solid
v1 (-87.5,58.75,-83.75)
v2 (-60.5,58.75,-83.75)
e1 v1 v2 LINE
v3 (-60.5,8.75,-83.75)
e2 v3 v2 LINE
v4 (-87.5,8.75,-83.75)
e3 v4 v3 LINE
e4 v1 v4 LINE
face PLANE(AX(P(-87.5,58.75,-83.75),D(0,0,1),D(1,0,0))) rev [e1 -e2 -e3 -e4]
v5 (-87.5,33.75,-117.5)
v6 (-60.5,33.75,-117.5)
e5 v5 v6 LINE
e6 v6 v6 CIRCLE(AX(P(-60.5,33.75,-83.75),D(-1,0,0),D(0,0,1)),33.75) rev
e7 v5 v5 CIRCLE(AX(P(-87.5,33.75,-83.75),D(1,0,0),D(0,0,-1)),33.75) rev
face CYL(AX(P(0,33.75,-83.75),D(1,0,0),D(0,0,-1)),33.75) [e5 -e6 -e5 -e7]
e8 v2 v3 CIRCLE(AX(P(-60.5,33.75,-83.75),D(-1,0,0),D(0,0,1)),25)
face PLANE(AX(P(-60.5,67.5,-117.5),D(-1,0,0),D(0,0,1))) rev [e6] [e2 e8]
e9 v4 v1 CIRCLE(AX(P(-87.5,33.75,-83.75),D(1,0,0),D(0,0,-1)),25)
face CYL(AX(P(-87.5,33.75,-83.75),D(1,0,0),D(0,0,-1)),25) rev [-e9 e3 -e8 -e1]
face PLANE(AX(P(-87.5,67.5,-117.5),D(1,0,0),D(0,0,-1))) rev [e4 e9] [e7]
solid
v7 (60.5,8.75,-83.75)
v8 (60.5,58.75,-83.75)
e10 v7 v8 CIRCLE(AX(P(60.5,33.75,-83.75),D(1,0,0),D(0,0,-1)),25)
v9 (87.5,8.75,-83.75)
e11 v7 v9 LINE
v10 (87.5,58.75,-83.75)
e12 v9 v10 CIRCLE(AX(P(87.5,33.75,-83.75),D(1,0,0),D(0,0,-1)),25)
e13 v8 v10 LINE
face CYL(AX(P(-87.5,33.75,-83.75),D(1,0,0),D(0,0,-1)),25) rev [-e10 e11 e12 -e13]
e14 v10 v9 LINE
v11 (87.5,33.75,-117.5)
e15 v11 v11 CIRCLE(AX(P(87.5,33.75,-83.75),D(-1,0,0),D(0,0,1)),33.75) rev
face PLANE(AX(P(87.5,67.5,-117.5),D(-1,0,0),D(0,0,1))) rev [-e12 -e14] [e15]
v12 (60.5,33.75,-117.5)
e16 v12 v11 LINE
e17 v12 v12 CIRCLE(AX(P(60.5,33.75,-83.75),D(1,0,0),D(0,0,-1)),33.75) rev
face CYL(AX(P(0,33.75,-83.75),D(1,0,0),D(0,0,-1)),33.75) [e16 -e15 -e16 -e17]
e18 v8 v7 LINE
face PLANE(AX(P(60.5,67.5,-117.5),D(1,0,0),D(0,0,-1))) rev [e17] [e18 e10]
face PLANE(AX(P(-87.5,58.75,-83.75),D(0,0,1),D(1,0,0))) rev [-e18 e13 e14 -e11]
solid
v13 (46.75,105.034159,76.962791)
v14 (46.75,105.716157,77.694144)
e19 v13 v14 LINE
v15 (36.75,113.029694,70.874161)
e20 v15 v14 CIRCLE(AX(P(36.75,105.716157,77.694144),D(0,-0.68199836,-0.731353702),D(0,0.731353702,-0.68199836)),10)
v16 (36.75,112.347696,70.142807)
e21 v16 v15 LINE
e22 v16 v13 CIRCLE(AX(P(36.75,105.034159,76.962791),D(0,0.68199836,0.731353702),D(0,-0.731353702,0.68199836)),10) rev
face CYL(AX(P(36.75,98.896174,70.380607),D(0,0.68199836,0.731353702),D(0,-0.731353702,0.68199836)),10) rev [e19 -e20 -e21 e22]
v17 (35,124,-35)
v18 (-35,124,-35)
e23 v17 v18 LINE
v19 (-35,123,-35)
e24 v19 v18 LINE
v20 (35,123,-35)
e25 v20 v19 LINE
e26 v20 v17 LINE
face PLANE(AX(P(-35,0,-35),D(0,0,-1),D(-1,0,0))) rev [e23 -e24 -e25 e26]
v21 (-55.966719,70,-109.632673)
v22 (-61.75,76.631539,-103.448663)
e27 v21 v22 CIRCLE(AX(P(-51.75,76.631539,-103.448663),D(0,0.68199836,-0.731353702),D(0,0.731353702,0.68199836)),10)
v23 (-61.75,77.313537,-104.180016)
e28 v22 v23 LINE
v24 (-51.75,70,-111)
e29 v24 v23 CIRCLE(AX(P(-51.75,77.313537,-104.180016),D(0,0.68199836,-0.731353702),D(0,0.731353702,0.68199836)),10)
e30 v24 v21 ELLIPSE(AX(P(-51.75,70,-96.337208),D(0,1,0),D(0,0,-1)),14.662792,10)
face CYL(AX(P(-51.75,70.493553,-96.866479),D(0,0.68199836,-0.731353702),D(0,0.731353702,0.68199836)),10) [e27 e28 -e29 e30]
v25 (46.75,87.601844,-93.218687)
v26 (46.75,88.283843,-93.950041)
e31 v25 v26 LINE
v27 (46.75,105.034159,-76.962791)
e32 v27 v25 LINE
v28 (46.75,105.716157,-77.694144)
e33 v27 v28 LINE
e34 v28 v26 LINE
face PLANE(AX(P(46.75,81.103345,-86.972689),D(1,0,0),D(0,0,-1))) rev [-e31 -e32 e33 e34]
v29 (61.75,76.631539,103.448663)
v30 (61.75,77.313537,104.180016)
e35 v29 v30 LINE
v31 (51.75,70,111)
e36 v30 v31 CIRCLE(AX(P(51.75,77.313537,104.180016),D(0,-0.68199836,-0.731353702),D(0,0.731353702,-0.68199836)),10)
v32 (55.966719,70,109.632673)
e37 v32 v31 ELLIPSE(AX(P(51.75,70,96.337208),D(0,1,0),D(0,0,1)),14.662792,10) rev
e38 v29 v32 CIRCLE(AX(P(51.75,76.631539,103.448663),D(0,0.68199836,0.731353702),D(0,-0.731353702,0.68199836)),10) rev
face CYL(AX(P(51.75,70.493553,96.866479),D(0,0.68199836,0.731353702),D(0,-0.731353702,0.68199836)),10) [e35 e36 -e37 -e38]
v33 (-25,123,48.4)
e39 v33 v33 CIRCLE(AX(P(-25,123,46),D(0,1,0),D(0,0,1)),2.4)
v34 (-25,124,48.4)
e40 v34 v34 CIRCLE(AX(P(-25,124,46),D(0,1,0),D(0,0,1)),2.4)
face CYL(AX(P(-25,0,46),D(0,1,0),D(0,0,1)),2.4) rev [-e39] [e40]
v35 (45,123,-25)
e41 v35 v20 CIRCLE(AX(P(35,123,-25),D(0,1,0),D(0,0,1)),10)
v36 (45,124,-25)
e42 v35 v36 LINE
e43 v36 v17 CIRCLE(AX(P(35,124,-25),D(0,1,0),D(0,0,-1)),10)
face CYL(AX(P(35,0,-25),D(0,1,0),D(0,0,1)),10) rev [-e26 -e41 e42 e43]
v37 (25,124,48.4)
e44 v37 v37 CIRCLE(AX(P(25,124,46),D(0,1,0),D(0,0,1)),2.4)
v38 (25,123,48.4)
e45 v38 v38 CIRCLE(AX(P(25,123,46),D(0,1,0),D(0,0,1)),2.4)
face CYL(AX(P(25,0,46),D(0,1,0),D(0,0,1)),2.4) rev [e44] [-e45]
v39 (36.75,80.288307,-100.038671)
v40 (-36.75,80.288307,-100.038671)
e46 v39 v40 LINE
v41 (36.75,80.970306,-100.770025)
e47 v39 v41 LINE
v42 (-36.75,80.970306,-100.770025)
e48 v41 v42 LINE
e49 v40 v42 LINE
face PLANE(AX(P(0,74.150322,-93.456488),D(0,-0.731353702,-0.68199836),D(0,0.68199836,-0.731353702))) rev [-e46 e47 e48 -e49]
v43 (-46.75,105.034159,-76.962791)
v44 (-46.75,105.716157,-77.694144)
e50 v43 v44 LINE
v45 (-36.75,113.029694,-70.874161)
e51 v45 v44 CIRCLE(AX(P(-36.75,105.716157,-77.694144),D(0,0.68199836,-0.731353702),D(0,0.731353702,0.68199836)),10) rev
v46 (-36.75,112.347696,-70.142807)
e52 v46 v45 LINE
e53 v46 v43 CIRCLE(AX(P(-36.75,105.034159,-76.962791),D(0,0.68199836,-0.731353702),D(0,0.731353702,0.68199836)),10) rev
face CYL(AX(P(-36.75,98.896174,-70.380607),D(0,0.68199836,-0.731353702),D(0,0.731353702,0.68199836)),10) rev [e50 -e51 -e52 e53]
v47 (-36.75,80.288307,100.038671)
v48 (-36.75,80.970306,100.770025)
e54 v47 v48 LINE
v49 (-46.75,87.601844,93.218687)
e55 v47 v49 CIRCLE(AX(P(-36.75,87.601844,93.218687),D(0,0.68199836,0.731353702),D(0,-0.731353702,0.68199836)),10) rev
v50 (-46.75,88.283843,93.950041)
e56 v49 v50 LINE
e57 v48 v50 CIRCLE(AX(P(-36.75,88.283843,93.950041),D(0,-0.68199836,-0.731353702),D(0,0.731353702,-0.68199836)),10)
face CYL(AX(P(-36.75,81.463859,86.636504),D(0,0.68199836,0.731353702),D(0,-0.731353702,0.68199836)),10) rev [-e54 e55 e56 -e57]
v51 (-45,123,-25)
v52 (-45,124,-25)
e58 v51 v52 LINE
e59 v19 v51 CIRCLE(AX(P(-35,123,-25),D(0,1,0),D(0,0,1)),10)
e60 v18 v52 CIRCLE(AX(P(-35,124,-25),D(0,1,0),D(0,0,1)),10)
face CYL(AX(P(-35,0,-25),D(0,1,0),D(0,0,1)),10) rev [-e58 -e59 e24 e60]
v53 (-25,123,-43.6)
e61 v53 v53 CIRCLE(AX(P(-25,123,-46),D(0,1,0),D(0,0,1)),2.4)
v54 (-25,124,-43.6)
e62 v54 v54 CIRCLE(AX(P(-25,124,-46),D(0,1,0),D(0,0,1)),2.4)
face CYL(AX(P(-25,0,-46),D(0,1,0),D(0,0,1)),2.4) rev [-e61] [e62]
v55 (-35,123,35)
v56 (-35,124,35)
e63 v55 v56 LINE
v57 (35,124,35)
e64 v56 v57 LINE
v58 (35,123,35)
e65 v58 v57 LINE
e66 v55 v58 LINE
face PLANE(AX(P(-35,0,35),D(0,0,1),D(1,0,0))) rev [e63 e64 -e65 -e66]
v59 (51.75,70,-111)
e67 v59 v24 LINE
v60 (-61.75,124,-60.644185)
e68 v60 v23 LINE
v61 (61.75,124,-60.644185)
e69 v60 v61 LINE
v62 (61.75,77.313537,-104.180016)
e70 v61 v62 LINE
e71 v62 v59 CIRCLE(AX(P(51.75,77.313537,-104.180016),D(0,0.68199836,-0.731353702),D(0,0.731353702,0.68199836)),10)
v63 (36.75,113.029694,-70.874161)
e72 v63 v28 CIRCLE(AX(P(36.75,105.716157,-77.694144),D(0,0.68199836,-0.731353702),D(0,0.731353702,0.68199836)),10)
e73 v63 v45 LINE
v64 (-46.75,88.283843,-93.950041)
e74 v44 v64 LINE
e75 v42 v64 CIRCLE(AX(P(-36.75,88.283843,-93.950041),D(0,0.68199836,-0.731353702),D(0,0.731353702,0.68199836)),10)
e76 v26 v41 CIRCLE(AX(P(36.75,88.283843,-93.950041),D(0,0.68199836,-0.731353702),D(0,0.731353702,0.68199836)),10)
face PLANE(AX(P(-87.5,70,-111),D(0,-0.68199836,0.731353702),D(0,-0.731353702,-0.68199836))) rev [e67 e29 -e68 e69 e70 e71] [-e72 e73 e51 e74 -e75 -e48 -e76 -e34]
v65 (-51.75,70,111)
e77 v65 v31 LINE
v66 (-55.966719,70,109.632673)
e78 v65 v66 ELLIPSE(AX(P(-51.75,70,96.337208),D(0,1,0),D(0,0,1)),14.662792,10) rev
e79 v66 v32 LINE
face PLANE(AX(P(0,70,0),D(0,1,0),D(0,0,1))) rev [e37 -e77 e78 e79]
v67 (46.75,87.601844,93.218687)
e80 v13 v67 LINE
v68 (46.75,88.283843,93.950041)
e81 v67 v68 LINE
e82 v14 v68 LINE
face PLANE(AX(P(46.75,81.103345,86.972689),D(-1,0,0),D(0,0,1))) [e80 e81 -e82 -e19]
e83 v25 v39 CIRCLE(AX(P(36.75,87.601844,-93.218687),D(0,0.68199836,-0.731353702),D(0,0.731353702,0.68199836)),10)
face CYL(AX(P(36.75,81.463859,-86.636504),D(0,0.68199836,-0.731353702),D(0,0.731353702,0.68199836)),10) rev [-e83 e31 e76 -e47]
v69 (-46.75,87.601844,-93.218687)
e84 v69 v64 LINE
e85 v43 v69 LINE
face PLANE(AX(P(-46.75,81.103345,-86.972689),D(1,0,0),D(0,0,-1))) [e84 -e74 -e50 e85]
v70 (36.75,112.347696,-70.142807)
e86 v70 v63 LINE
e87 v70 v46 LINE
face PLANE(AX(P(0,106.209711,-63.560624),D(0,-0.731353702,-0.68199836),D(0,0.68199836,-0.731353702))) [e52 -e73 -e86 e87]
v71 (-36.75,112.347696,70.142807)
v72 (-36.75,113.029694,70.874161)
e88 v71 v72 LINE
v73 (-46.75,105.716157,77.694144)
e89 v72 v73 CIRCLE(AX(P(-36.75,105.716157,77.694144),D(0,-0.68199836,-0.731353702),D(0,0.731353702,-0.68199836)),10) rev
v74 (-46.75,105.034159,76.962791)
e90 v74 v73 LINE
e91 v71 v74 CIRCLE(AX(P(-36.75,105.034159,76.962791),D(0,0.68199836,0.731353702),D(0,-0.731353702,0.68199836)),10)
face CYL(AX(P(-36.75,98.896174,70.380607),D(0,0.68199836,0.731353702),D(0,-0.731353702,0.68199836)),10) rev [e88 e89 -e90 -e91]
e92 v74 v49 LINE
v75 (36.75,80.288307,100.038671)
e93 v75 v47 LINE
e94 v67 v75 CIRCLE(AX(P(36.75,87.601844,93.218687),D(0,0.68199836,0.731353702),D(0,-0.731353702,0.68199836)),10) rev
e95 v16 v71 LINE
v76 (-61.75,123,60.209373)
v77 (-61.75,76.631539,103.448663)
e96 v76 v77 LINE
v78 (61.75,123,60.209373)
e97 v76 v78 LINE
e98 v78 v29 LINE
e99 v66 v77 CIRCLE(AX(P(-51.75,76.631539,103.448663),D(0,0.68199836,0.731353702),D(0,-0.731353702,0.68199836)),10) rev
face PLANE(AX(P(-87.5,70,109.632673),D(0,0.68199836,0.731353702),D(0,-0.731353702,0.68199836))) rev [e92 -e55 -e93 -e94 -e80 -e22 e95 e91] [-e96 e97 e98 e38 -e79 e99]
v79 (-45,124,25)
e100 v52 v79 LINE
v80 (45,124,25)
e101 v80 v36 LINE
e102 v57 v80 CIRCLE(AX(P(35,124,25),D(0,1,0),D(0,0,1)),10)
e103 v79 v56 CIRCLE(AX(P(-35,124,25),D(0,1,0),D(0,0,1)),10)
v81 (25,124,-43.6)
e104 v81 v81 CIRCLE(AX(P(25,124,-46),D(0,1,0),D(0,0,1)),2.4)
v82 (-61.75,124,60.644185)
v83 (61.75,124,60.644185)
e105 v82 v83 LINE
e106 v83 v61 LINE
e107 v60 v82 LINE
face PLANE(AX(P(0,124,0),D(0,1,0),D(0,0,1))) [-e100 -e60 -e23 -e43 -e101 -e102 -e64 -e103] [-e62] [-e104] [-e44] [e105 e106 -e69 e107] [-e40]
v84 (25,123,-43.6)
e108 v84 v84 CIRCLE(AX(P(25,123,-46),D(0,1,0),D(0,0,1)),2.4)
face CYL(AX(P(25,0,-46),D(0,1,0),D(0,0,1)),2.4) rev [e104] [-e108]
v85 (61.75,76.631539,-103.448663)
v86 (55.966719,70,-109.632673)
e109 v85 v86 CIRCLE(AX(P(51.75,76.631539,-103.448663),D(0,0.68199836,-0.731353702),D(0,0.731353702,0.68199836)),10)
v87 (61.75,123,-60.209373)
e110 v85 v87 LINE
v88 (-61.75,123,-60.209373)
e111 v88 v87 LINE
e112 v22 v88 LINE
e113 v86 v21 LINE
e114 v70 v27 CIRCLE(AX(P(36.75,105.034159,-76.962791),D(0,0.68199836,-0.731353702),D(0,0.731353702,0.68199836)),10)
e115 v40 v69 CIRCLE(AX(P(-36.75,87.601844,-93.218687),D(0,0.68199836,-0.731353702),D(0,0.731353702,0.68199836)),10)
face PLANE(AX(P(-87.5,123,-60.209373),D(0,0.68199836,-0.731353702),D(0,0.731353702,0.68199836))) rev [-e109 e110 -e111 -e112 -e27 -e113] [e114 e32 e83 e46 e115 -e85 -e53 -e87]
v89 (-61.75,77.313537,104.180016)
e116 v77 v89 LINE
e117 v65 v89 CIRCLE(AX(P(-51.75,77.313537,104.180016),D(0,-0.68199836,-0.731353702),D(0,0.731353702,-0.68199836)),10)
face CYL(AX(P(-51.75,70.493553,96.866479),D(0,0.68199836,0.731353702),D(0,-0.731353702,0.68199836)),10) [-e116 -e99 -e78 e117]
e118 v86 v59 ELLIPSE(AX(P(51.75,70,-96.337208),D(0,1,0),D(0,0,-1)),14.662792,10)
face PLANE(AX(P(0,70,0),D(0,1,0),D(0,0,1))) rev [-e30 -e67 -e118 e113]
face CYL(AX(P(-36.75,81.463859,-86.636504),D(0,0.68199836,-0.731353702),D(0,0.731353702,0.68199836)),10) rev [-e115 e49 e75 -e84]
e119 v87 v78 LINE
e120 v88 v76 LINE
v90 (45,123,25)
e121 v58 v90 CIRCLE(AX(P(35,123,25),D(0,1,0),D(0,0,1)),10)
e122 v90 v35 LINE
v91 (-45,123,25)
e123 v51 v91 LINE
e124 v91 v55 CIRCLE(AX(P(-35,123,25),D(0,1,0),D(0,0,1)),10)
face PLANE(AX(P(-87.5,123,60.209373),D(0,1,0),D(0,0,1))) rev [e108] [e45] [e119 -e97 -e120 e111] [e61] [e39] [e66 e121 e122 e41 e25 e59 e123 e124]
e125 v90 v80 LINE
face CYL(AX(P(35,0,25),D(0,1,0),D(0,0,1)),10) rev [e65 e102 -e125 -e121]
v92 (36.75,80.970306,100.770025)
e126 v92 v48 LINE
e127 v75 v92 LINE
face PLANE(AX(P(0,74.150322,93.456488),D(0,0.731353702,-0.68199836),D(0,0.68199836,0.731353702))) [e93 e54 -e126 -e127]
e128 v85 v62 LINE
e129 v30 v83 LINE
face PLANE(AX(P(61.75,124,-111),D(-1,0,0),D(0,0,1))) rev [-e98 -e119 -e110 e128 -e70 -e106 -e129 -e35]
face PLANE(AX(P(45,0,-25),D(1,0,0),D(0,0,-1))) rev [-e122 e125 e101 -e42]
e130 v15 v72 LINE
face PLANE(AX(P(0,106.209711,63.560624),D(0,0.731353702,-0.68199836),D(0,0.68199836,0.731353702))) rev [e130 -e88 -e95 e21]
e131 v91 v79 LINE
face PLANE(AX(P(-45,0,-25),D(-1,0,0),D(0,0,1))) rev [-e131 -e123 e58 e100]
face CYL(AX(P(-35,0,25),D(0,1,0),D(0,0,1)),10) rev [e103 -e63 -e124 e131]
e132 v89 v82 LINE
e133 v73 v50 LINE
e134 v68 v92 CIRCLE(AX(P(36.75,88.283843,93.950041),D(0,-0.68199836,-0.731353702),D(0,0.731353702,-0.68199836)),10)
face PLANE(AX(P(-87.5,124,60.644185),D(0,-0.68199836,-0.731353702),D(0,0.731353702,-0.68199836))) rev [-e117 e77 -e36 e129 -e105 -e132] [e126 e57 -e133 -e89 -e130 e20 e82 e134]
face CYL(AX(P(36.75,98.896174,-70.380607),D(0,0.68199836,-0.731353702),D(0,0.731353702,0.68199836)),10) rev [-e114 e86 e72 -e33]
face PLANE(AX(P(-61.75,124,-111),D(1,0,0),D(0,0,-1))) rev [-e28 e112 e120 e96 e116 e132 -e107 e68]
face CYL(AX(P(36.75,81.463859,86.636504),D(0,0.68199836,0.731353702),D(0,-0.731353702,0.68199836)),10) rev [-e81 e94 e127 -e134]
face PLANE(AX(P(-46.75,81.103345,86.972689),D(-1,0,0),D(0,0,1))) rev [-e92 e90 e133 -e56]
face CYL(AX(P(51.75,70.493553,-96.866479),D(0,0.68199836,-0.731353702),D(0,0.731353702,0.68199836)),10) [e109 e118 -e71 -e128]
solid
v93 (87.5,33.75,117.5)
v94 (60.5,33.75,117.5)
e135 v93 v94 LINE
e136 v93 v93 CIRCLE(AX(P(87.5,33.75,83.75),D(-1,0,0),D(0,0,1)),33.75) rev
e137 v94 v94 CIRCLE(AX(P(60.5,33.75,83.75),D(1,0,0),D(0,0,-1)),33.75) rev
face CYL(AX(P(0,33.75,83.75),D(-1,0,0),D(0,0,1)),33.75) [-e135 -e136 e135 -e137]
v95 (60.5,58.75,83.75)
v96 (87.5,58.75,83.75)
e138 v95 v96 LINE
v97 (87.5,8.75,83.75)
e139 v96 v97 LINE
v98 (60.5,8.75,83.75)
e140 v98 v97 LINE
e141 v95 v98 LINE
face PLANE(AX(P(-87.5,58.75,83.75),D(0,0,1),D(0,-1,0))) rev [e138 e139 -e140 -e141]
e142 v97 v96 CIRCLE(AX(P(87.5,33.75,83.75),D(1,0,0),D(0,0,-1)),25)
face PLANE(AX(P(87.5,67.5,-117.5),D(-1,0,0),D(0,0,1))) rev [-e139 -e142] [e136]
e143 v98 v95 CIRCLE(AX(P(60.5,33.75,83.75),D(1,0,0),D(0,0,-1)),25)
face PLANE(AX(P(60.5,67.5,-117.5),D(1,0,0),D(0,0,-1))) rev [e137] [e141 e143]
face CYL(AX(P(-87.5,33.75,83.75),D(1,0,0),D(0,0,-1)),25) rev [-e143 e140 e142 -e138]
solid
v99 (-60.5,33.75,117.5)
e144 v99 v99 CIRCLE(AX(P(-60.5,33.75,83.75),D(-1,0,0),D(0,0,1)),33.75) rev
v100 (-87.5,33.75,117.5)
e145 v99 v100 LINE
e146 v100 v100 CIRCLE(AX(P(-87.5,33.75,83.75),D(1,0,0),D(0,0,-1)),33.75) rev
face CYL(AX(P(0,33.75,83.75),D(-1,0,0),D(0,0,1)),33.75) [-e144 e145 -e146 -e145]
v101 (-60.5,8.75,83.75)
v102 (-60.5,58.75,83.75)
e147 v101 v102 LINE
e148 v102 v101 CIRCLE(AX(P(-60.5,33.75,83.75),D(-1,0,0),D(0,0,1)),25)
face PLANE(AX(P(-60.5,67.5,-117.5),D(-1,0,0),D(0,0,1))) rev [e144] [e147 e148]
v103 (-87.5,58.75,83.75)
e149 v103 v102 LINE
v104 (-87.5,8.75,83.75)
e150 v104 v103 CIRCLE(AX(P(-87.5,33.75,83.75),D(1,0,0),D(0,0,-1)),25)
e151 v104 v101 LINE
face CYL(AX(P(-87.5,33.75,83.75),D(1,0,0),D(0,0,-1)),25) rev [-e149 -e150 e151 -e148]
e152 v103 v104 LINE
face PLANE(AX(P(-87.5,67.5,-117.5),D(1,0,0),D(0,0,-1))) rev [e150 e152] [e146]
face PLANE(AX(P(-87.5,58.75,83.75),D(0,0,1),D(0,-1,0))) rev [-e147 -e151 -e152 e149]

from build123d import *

# Parameters (mm, degrees)
ESBO_O1_W                  = 175
ESBO_O1_H                  = 235
RESSALTO_EXTRUS_O1_DEPTH   = 67.5
FILETE1_R                  = 33.75
CORTE_EXTRUS_O1_DEPTH      = 222.331199789
CORTE_EXTRUS_O2_DEPTH      = 162.303285769
CORTE_EXTRUS_O2_DEPTH_BACK = 162.303285769
ESBO_O3_W                  = 121
ESBO_O3_H                  = 67.5
ESBO_O4_W                  = 123.5
ESBO_O4_H                  = 222
RESSALTO_EXTRUS_O2_DEPTH   = 54
CORTE_EXTRUS_O3_DEPTH      = 227.843145147
ESBO_O7_R                  = 2.4
CORTE_EXTRUS_O4_DEPTH      = 192.933582262
CORTE_EXTRUS_O5_DEPTH      = 10
CORTE_EXTRUS_O6_DEPTH      = 245.555208491


with BuildPart() as part:
    # Esboço1 → Ressalto-extrusão1 (new body)
    with BuildSketch(Plane(origin=(0, 0, 0), x_dir=(1, 0, 0), z_dir=(0, 1, 0))):
        Rectangle(ESBO_O1_W, ESBO_O1_H)
    extrude(amount=RESSALTO_EXTRUS_O1_DEPTH)

    # Filete1
    filete1_edges = [part.edges().sort_by_distance(p)[0] for p in [
        (0, 0, -117.5),
        (0, 67.5, -117.5),
        (0, 0, 117.5),
        (0, 67.5, 117.5),
    ]]
    fillet(filete1_edges, radius=FILETE1_R - 0.0001)  # a hair under: the kernel refuses the full size

    # Esboço2 → Corte-extrusão1 (cut, through all)
    with BuildSketch(Plane(origin=(87.5, 0, 0), x_dir=(0, 0, -1), z_dir=(1, 0, 0))):
        with BuildLine():
            Line((-83.75, 67.5), (83.75, 67.5))
            ThreePointArc((83.75, 67.5), (50, 33.75), (83.75, 0))
            Line((83.75, 0), (-83.75, 0))
            ThreePointArc((-83.75, 0), (-50, 33.75), (-83.75, 67.5))
        make_face()
    extrude(amount=-CORTE_EXTRUS_O1_DEPTH, mode=Mode.SUBTRACT)


with BuildPart() as corte_extrus_o1_piece_1:
    # of the separate pieces the step leaves, piece 1, a body of its own (corte_extrus_o1_pieces)
    add(part.part.solids().sort_by_distance((-87.5, 33.7499, -117.5))[0])


with BuildPart() as corte_extrus_o1_piece_2:
    # of the separate pieces the step leaves, piece 2, a body of its own (corte_extrus_o1_pieces)
    add(part.part.solids().sort_by_distance((-87.5, 33.7499, 117.5))[0])


with BuildPart() as corte_extrus_o2_tool:
    # Esboço3 → Corte-extrusão2 (new, two sides: drawn at the far end of the back side and taken through both)
    with BuildSketch(Plane.XY.offset(-CORTE_EXTRUS_O2_DEPTH_BACK)):
        with Locations((0, 33.75)):
            Rectangle(ESBO_O3_W, ESBO_O3_H)
    extrude(amount=CORTE_EXTRUS_O2_DEPTH + CORTE_EXTRUS_O2_DEPTH_BACK)


with BuildPart() as corte_extrus_o1_piece_1_1:
    add(corte_extrus_o1_piece_1.part)

    # Corte-extrusão2: cut by corte_extrus_o2_tool
    add(corte_extrus_o2_tool.part, mode=Mode.SUBTRACT)


with BuildPart() as corte_extrus_o1_piece_2_1:
    add(corte_extrus_o1_piece_2.part)

    # Corte-extrusão2: cut by corte_extrus_o2_tool
    add(corte_extrus_o2_tool.part, mode=Mode.SUBTRACT)


with BuildPart() as corte_extrus_o2_piece_1:
    # of the separate pieces the step leaves, piece 1, a body of its own (corte_extrus_o2_pieces)
    add(corte_extrus_o1_piece_1_1.part.solids().sort_by_distance((-87.5, 33.7499, -117.5))[0])


with BuildPart() as corte_extrus_o2_piece_2:
    # of the separate pieces the step leaves, piece 2, a body of its own (corte_extrus_o2_pieces)
    add(corte_extrus_o1_piece_1_1.part.solids().sort_by_distance((60.5, 33.7499, -117.5))[0])


with BuildPart() as corte_extrus_o2_piece_1_of_corte_extrus:
    # of the separate pieces the step leaves, piece 1, a body of its own (corte_extrus_o2_pieces_of_corte_extrus_o)
    add(corte_extrus_o1_piece_2_1.part.solids().sort_by_distance((87.5, 33.7499, 117.5))[0])


with BuildPart() as corte_extrus_o2_piece_2_of_corte_extrus:
    # of the separate pieces the step leaves, piece 2, a body of its own (corte_extrus_o2_pieces_of_corte_extrus_o)
    add(corte_extrus_o1_piece_2_1.part.solids().sort_by_distance((-87.5, 33.7499, 117.5))[0])


with BuildPart() as body_5:
    # Esboço4 → Ressalto-extrusão2 (new body)
    with BuildSketch(Plane(origin=(0, 70, 0), x_dir=(1, 0, 0), z_dir=(0, 1, 0))):
        Rectangle(ESBO_O4_W, ESBO_O4_H)
    extrude(amount=RESSALTO_EXTRUS_O2_DEPTH)

    # Esboço6 → Corte-extrusão3 (cut, through all)
    with BuildSketch(Plane(origin=(61.75, 0, 0), x_dir=(0, 0, -1), z_dir=(1, 0, 0))):
        Polygon((-111, 70), (-111, 124), (-60.644185349, 124), align=None)
        Polygon((111, 124), (111, 70), (60.644185349, 124), align=None)
        Polygon((-109.632672539, 70), (-60.209372974, 123), (60.209372974, 123), (109.632672539, 70), align=None)
    extrude(amount=-CORTE_EXTRUS_O3_DEPTH, mode=Mode.SUBTRACT)

    # Esboço7 → Corte-extrusão4 (cut, through all)
    with BuildSketch(Plane(origin=(0, 124, 0), x_dir=(1, 0, 0), z_dir=(0, 1, 0))):
        with Locations(Location((-25, -46, 0), (0, 0, 270))):
            Circle(ESBO_O7_R)
        with Locations(Location((25, -46, 0), (0, 0, 270))):
            Circle(ESBO_O7_R)
        with Locations(Location((-25, 46, 0), (0, 0, 270))):
            Circle(ESBO_O7_R)
        with Locations(Location((25, 46, 0), (0, 0, 270))):
            Circle(ESBO_O7_R)
        with BuildLine():
            Line((-35, 35), (35, 35))
            ThreePointArc((35, 35), (42.071067812, 32.071067812), (45, 25))
            Line((45, 25), (45, -25))
            ThreePointArc((45, -25), (42.071067812, -32.071067812), (35, -35))
            Line((35, -35), (-35, -35))
            ThreePointArc((-35, -35), (-42.071067812, -32.071067812), (-45, -25))
            Line((-45, -25), (-45, 25))
            ThreePointArc((-45, 25), (-42.071067812, 32.071067812), (-35, 35))
        make_face()
    extrude(amount=-CORTE_EXTRUS_O4_DEPTH, mode=Mode.SUBTRACT)

    # Esboço8 → Corte-extrusão5 (cut)
    with BuildSketch(Plane(origin=(0, 87.923328208, -94.286226052), x_dir=(-1, 0, 0), z_dir=(0, 0.6819983600624947, -0.731353701619174))):
        with BuildLine():
            Line((-36.75, 34.328624046), (36.75, 34.328624046))
            ThreePointArc((36.75, 34.328624046), (43.821067812, 31.399691858), (46.75, 24.328624046))
            Line((46.75, 24.328624046), (46.75, 0.492941146))
            ThreePointArc((46.75, 0.492941146), (43.821067812, -6.578126665), (36.75, -9.507058854))
            Line((36.75, -9.507058854), (-36.75, -9.507058854))
            ThreePointArc((-36.75, -9.507058854), (-43.821067812, -6.578126665), (-46.75, 0.492941146))
            Line((-46.75, 0.492941146), (-46.75, 24.328624046))
            ThreePointArc((-46.75, 24.328624046), (-43.821067812, 31.399691858), (-36.75, 34.328624046))
        make_face()
        with BuildLine():
            Line((-61.75, -24.507058854), (-51.75, -24.507058854))
            ThreePointArc((-51.75, -24.507058854), (-58.821067812, -21.578126665), (-61.75, -14.507058854))
            Line((-61.75, -14.507058854), (-61.75, -24.507058854))
        make_face()
        with BuildLine():
            ThreePointArc((61.75, -14.507058854), (58.821067812, -21.578126665), (51.75, -24.507058854))
            Line((51.75, -24.507058854), (61.75, -24.507058854))
            Line((61.75, -24.507058854), (61.75, -14.507058854))
        make_face()
    corte_extrus_o5 = extrude(amount=-CORTE_EXTRUS_O5_DEPTH, mode=Mode.SUBTRACT)

    # Espelhar1: Corte-extrusão5 across plane
    add(corte_extrus_o5.mirror(Plane.XY), mode=Mode.SUBTRACT)


with BuildPart() as corte_extrus_o6_tool:
    # Esboço9 → Corte-extrusão6 (new, through all)
    with BuildSketch(Plane(origin=(87.5, 0, 0), x_dir=(0, 0, -1), z_dir=(1, 0, 0))):
        with BuildLine():
            Line((-83.75, 58.75), (-83.75, 8.75))
            ThreePointArc((-83.75, 8.75), (-58.75, 33.75), (-83.75, 58.75))
        make_face()
        with BuildLine():
            Line((83.75, 58.75), (83.75, 8.75))
            ThreePointArc((83.75, 8.75), (108.75, 33.75), (83.75, 58.75))
        make_face()
    extrude(amount=-CORTE_EXTRUS_O6_DEPTH)


with BuildPart() as corte_extrus_o2_piece_1_1:
    add(corte_extrus_o2_piece_1.part)

    # Corte-extrusão6: cut by corte_extrus_o6_tool
    add(corte_extrus_o6_tool.part, mode=Mode.SUBTRACT)


with BuildPart() as corte_extrus_o2_piece_2_1:
    add(corte_extrus_o2_piece_2.part)

    # Corte-extrusão6: cut by corte_extrus_o6_tool
    add(corte_extrus_o6_tool.part, mode=Mode.SUBTRACT)


with BuildPart() as corte_extrus_o2_piece_1_of_corte_extrus_1:
    add(corte_extrus_o2_piece_1_of_corte_extrus.part)

    # Corte-extrusão6: cut by corte_extrus_o6_tool
    add(corte_extrus_o6_tool.part, mode=Mode.SUBTRACT)


with BuildPart() as corte_extrus_o2_piece_2_of_corte_extrus_1:
    add(corte_extrus_o2_piece_2_of_corte_extrus.part)

    # Corte-extrusão6: cut by corte_extrus_o6_tool
    add(corte_extrus_o6_tool.part, mode=Mode.SUBTRACT)


solid = Compound([body_5.part, corte_extrus_o2_piece_1_1.part, corte_extrus_o2_piece_2_1.part, corte_extrus_o2_piece_1_of_corte_extrus_1.part, corte_extrus_o2_piece_2_of_corte_extrus_1.part])
